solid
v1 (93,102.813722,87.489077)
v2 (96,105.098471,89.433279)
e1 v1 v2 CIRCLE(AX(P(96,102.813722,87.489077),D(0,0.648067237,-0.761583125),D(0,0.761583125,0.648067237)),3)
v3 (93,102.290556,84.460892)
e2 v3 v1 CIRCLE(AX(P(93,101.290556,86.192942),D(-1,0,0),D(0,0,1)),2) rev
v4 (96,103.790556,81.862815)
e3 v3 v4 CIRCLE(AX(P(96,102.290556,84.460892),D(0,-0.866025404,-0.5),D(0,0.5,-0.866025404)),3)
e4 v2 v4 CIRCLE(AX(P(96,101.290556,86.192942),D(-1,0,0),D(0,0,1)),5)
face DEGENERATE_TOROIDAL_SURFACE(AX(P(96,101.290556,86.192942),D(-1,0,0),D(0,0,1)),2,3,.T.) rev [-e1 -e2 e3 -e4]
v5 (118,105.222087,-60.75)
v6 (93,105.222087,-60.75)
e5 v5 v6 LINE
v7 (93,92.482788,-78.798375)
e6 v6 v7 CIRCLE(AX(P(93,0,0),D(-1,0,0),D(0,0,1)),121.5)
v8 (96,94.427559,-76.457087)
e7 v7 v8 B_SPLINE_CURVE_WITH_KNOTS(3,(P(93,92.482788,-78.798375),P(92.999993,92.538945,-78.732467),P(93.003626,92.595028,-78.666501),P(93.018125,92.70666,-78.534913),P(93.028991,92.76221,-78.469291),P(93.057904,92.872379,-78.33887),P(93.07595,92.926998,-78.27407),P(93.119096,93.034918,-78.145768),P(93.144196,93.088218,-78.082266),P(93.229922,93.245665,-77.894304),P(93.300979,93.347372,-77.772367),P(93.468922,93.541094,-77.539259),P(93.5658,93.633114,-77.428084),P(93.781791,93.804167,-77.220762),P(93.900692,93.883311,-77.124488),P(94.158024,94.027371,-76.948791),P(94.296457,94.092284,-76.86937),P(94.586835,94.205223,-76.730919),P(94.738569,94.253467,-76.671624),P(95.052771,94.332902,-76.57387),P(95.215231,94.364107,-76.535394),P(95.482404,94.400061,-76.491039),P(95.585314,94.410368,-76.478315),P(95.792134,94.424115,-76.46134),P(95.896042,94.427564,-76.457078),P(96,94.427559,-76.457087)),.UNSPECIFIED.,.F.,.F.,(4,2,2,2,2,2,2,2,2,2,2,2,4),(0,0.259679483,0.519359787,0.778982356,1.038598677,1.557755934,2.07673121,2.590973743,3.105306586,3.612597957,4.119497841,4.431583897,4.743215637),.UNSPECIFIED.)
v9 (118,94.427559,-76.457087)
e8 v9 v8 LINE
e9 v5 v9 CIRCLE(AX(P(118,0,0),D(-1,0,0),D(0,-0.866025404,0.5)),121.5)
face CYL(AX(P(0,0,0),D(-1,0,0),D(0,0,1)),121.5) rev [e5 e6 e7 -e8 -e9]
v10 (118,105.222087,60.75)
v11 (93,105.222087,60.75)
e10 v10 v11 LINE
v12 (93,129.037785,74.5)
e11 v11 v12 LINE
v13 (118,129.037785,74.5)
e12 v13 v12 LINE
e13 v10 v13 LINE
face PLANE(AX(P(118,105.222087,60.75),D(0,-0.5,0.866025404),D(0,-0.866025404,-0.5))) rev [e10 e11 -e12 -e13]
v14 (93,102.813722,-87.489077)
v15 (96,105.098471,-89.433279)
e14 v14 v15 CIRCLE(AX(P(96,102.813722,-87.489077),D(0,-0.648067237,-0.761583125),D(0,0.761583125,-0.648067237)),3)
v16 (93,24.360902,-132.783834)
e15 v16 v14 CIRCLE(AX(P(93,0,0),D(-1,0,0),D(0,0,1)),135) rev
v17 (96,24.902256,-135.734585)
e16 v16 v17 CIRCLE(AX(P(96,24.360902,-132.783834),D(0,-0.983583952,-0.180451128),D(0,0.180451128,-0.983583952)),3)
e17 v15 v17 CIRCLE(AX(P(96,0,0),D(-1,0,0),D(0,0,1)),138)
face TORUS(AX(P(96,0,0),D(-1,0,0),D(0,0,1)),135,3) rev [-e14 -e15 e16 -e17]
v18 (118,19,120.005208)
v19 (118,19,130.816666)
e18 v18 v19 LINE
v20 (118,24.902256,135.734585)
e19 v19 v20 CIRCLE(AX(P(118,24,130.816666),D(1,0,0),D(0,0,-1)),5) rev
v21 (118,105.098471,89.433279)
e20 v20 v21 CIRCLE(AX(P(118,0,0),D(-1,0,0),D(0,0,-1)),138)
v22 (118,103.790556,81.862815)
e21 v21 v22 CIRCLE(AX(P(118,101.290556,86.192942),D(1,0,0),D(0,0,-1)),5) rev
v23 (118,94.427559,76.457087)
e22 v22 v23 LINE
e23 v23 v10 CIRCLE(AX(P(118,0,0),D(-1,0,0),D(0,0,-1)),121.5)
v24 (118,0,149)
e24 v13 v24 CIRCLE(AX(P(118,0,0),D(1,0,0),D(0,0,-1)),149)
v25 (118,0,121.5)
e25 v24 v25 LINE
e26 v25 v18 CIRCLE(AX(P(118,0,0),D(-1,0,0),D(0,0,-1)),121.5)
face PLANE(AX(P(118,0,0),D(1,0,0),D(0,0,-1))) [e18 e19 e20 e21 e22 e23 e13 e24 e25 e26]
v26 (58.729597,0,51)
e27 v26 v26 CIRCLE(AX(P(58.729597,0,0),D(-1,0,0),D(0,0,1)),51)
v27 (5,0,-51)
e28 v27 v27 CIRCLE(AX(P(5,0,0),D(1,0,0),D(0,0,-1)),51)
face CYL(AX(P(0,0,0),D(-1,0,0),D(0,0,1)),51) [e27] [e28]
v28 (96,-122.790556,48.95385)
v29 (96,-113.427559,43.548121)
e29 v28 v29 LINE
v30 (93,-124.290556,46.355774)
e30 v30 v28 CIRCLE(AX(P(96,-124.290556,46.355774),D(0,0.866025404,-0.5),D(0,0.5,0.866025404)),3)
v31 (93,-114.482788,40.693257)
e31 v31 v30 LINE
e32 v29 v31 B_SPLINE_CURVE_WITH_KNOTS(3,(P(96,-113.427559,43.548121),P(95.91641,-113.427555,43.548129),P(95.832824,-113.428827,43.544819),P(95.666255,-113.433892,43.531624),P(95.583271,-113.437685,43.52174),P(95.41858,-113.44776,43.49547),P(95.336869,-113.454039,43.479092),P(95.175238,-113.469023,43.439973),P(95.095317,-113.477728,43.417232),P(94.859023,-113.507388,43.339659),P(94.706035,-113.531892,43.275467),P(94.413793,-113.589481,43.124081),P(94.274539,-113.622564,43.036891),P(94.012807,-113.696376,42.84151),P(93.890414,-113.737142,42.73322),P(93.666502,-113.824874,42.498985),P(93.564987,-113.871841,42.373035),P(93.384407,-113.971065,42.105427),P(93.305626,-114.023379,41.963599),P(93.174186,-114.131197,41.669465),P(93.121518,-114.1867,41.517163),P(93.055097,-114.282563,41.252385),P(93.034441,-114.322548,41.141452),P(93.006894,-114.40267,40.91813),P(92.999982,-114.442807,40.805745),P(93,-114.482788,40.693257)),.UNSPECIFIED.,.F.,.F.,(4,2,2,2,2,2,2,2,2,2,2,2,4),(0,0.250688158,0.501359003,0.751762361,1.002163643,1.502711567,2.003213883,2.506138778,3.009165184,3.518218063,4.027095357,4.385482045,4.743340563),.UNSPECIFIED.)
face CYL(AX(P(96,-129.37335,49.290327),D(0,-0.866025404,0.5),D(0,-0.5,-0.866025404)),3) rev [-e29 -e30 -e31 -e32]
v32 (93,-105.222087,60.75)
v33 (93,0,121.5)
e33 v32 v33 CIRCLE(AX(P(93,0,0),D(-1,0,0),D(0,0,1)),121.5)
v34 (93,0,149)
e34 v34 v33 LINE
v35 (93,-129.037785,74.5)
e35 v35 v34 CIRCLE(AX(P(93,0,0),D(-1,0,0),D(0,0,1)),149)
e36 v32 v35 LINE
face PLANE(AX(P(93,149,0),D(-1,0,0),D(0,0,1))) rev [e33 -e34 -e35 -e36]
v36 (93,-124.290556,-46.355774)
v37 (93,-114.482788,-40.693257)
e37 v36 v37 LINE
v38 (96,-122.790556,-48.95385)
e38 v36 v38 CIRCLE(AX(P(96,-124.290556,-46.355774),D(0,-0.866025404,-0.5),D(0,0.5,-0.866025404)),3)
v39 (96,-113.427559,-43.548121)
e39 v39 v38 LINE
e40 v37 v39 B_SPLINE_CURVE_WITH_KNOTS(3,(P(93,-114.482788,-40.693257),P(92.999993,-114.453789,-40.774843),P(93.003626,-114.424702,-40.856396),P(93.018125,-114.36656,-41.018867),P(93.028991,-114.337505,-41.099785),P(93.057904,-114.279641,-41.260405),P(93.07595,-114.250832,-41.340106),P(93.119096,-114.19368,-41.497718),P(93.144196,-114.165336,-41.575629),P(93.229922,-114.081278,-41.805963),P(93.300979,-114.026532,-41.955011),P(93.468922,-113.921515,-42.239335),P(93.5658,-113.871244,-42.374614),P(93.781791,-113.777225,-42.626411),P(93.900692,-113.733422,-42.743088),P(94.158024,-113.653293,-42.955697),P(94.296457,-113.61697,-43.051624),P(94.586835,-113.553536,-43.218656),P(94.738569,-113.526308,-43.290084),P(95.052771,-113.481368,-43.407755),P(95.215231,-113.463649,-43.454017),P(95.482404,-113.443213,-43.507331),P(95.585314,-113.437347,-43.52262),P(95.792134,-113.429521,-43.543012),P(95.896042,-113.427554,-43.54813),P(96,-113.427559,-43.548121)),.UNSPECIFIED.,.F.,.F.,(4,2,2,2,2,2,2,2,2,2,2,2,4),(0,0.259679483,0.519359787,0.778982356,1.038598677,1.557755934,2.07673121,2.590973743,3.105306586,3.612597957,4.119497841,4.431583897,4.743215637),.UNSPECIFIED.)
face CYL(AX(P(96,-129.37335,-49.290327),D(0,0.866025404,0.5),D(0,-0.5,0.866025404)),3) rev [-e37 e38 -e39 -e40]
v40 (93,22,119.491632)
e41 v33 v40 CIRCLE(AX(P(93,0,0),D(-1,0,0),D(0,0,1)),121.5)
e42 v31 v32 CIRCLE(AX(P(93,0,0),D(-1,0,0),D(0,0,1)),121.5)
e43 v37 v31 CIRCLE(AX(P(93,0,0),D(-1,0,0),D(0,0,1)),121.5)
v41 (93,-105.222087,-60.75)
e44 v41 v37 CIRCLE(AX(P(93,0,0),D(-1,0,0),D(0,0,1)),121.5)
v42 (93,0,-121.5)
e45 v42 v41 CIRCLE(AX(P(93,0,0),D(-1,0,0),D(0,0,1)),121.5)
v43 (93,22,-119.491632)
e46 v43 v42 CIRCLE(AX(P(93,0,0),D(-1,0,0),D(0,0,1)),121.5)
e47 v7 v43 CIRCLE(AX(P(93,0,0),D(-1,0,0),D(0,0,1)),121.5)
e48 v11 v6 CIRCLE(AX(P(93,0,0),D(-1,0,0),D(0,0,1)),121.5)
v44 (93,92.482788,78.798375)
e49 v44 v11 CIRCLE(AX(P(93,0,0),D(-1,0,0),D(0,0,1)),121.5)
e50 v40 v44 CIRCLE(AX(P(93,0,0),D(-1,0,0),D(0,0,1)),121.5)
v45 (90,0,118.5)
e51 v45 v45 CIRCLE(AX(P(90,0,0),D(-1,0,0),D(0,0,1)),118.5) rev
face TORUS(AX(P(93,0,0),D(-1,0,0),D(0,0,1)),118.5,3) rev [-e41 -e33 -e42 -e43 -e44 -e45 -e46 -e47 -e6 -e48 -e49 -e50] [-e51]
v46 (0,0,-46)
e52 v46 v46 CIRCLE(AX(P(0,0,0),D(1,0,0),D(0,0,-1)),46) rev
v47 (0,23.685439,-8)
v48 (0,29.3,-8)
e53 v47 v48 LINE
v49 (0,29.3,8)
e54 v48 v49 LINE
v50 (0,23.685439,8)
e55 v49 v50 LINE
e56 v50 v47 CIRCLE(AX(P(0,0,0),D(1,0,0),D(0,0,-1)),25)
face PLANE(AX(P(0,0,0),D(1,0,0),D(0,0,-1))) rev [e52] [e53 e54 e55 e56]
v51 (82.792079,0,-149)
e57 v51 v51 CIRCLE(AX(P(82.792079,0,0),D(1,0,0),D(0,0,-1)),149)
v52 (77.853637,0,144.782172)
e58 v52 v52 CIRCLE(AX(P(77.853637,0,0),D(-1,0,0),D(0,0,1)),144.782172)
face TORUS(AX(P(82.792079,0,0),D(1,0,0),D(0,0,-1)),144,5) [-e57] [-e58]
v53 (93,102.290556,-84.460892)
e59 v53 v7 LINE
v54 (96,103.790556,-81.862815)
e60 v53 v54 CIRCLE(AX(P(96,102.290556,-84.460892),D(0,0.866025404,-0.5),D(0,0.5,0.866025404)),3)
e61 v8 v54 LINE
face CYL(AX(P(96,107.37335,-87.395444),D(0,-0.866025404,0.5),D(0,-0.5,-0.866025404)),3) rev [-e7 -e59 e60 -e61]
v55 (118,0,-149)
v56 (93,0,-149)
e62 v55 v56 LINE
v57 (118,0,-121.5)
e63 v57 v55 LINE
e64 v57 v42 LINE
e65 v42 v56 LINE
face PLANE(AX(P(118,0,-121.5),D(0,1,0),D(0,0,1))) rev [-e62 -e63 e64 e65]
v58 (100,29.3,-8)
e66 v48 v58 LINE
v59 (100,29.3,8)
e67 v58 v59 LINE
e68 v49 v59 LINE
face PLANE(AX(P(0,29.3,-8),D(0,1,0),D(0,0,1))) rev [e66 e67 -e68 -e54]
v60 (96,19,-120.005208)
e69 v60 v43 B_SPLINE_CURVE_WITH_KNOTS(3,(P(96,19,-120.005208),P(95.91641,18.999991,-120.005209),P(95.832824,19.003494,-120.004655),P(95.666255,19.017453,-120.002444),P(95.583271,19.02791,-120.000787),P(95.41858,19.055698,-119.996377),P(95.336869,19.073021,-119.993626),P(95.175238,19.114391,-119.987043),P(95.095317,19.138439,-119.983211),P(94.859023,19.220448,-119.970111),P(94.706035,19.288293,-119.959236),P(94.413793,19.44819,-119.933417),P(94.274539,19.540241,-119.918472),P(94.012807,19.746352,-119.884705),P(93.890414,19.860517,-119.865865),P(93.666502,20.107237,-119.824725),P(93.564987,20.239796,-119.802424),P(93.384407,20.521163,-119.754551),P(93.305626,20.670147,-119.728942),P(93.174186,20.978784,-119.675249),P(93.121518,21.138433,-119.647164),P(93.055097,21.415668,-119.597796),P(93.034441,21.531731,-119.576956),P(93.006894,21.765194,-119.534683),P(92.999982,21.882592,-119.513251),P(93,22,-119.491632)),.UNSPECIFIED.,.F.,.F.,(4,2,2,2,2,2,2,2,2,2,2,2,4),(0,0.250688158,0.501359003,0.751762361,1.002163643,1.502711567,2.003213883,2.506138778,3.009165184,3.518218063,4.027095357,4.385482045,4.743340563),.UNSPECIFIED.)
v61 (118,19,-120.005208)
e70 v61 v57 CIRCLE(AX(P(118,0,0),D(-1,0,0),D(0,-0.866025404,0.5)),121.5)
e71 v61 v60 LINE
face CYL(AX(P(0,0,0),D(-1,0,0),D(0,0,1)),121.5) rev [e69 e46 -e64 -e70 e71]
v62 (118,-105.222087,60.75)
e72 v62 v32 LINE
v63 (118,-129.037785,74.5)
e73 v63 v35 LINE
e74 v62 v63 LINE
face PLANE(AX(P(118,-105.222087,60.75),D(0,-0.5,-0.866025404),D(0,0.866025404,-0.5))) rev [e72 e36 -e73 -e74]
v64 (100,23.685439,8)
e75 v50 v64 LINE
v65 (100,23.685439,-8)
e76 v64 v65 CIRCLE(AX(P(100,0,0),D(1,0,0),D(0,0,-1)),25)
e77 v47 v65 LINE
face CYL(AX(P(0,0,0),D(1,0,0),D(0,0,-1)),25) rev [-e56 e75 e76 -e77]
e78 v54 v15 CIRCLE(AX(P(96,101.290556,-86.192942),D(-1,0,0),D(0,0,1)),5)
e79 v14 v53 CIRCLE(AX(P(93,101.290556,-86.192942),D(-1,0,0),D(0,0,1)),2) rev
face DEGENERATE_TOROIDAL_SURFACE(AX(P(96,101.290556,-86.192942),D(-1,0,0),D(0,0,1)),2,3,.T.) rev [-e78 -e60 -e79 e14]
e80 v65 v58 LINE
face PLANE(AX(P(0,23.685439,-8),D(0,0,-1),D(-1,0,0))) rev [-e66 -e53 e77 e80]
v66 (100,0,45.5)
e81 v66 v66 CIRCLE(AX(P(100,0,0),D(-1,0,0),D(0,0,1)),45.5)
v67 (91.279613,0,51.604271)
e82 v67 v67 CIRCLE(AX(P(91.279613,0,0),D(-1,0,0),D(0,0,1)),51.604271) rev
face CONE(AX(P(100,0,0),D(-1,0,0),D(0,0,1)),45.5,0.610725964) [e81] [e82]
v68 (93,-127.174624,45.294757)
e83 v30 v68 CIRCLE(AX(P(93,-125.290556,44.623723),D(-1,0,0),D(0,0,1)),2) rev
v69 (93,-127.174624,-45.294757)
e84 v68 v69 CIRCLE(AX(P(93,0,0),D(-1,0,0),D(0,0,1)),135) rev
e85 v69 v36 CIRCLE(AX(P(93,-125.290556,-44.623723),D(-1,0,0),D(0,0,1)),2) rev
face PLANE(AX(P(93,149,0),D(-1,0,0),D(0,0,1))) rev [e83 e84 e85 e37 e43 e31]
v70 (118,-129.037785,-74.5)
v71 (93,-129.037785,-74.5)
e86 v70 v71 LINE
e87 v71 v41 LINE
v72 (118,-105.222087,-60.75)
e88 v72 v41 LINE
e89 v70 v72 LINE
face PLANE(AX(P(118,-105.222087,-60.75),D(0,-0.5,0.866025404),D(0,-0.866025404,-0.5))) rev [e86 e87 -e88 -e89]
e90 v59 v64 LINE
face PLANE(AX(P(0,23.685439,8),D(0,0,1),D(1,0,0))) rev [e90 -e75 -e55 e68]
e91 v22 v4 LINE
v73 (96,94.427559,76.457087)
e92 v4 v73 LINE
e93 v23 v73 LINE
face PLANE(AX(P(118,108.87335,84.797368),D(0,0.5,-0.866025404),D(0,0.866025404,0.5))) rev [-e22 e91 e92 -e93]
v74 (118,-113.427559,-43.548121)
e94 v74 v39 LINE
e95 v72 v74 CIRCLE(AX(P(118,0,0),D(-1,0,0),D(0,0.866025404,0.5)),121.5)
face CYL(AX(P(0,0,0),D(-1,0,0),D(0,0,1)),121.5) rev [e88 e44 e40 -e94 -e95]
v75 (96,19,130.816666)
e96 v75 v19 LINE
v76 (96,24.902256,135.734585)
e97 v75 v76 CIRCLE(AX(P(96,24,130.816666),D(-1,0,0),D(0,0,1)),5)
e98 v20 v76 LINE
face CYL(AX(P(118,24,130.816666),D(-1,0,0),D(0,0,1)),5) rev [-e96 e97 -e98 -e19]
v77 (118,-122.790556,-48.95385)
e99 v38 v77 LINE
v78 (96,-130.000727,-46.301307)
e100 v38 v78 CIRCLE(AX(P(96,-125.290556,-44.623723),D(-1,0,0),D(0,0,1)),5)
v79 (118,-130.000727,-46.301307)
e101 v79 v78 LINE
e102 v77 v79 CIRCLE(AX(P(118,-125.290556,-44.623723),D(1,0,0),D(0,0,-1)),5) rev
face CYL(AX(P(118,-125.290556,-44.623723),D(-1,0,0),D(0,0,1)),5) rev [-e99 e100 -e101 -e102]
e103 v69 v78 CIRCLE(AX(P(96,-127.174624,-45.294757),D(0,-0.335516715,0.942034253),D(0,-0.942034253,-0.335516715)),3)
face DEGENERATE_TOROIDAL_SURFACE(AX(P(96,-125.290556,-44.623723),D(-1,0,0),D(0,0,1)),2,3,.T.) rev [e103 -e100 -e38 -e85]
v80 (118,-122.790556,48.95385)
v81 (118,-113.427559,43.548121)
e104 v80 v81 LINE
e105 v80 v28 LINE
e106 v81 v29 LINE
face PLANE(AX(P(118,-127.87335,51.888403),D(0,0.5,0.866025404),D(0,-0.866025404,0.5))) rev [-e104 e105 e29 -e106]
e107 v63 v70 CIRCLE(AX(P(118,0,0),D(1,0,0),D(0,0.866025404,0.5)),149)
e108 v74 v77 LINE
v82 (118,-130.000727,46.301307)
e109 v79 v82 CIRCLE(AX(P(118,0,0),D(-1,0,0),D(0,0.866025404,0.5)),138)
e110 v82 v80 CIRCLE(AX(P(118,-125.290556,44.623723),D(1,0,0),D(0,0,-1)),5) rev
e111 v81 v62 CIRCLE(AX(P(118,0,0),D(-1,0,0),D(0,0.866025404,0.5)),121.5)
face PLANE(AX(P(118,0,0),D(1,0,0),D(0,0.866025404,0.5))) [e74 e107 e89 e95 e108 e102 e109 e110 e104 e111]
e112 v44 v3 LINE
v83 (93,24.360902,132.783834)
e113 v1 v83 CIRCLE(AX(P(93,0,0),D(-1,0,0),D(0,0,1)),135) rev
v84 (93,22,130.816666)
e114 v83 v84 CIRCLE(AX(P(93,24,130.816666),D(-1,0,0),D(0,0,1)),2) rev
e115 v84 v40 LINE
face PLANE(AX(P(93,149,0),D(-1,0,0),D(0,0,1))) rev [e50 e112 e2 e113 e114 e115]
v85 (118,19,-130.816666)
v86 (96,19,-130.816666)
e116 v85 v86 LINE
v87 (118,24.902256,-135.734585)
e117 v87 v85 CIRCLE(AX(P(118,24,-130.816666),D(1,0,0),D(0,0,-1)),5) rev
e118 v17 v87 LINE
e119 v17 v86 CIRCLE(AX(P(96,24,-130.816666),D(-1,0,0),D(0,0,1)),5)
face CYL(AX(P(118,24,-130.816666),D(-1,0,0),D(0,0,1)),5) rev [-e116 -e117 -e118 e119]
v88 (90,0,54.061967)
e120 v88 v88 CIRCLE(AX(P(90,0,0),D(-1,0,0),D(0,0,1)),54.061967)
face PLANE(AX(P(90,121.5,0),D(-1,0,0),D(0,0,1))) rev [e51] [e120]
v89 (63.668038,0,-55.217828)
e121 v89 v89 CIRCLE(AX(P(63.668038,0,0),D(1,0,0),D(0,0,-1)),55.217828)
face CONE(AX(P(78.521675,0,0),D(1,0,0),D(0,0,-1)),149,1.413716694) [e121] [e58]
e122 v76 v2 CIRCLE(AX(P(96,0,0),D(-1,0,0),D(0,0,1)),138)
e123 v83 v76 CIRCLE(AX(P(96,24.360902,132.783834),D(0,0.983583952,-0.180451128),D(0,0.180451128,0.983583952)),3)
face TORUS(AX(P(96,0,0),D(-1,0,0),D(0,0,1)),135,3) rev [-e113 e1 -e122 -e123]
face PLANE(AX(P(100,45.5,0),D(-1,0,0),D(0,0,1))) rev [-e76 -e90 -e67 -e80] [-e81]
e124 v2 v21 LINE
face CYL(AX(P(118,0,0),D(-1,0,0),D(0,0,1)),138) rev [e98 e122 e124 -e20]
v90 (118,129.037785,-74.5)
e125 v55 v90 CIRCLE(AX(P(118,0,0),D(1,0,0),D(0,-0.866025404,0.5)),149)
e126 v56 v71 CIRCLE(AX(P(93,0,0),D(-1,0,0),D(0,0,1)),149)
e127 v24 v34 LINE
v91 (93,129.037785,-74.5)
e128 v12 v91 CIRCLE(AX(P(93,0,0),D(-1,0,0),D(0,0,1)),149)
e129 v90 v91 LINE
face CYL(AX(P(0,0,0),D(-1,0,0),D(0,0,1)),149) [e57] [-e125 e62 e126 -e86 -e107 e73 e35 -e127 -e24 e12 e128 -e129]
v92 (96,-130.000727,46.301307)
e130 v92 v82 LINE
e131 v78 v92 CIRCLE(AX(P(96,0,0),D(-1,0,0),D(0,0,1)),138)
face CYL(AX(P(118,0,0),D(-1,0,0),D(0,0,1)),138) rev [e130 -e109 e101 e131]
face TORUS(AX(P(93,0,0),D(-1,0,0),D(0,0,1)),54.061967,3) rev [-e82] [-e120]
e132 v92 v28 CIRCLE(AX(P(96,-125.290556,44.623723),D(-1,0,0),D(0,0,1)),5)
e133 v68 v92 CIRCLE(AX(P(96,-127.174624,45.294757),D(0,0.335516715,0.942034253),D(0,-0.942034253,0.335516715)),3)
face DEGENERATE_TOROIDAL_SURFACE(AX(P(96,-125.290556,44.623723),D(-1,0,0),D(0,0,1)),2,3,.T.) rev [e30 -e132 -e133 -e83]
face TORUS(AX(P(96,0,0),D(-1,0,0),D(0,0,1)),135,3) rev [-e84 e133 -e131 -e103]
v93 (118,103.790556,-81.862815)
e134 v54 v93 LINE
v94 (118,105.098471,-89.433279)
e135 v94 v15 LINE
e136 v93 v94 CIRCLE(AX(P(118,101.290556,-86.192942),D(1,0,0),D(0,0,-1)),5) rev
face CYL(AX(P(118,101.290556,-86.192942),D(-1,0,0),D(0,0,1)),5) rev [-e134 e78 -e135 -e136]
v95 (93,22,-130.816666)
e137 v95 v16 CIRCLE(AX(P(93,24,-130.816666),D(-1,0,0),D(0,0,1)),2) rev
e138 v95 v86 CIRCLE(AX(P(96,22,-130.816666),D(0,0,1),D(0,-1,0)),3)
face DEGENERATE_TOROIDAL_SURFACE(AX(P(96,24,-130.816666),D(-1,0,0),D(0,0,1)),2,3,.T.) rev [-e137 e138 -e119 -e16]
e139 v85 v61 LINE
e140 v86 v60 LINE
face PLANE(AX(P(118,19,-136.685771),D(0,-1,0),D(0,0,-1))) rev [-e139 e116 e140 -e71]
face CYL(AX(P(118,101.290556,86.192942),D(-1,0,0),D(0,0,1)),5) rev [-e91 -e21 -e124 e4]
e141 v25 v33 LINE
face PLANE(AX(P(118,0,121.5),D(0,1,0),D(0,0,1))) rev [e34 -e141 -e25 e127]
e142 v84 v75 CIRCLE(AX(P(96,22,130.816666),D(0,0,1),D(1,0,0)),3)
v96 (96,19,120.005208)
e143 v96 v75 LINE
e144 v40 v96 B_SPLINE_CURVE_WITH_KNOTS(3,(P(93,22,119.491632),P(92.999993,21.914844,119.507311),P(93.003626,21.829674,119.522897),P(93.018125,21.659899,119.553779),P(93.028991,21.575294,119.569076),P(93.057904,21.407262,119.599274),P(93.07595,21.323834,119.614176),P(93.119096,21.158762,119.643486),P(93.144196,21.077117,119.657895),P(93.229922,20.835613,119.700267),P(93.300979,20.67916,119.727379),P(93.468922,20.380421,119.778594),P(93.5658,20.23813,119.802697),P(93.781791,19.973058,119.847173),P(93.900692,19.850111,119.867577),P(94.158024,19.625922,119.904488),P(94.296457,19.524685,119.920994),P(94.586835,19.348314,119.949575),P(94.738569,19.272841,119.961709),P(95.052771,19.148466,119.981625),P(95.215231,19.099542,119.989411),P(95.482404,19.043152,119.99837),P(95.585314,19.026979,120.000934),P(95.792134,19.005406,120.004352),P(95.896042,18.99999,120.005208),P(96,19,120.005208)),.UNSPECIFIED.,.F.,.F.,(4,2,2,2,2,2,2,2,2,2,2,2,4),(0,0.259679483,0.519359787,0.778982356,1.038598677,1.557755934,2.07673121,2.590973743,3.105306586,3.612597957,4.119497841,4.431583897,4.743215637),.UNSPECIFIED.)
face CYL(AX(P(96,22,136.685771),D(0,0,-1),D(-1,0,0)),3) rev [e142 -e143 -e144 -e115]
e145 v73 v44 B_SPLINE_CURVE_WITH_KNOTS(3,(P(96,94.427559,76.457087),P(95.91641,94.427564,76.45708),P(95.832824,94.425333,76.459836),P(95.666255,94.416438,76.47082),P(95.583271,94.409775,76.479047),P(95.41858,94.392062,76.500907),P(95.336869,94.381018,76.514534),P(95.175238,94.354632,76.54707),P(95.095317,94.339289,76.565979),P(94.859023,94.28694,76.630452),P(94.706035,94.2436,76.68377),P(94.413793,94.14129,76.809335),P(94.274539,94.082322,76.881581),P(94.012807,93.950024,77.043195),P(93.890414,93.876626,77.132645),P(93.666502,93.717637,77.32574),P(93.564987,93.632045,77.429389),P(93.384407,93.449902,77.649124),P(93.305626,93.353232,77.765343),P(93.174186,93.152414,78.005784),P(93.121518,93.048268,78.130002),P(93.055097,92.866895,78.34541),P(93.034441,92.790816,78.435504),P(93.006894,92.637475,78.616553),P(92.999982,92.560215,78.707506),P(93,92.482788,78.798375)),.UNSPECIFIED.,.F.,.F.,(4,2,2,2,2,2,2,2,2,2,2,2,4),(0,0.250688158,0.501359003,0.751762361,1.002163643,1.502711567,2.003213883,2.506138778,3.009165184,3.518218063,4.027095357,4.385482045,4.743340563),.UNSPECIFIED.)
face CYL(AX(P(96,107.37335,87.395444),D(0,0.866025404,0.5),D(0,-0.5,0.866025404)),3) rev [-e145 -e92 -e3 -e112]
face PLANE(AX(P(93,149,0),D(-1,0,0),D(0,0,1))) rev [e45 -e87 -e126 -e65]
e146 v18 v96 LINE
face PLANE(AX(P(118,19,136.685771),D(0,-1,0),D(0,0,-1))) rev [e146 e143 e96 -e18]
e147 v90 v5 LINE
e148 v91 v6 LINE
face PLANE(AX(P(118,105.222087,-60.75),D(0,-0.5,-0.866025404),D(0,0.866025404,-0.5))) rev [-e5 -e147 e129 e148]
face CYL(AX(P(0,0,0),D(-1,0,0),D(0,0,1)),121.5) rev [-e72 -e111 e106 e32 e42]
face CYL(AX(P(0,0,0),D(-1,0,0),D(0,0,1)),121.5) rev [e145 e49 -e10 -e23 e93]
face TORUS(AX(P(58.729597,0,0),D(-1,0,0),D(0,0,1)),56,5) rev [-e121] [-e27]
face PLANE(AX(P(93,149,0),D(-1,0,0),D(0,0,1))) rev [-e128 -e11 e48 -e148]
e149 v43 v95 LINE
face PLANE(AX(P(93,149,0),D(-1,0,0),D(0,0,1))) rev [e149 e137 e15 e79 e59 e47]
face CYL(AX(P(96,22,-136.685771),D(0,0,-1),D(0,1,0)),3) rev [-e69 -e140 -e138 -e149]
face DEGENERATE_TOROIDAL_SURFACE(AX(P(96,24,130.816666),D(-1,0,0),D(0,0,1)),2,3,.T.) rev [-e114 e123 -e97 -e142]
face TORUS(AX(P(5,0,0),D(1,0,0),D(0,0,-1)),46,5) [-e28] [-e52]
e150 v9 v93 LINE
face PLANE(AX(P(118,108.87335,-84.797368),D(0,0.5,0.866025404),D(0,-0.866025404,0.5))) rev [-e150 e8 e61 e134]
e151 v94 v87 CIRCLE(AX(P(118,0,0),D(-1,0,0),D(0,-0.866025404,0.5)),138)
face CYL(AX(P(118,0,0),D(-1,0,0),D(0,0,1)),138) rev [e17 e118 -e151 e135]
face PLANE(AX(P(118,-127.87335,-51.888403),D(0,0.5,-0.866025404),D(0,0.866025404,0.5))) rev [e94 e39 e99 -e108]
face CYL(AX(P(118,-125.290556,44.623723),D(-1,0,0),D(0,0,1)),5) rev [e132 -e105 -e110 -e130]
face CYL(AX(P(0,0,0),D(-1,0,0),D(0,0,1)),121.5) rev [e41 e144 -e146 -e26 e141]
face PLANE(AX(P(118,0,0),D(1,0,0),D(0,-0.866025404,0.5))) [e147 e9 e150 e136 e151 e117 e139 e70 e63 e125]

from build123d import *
from build123d.topology import SkipClean

# Parameters (mm, degrees)
EXTRUDE_1_DEPTH          = 25
PATTERN_CIRCULAR_1_COUNT = 3
CUT_EXTRUDE_2_DEPTH      = 234.242363219
FILLET_1_R               = 5
FILLET_2_R               = 3
FILLET_4_R               = 3


# Some blends are built 0.0001 mm under size
with BuildPart() as part:
    # 草圖1 → 旋轉1 (revolve)
    with BuildSketch(Plane.XY, mode=Mode.PRIVATE) as revolve_1_sk:
        Polygon((0, 0), (0, 51), (63, 51), (78.521675152, 149), (93, 149), (93, 121.5), (90, 121.5), (90, 52.5), (100, 45.5), (100, 0), align=None)
    revolve(revolve_1_sk.sketch.rotate(Axis((0, 0, 0), (1, 0, 0)), 90), axis=Axis((0, 0, 0), (1, 0, 0)))

    # 草圖2 → 伸長1 (add)
    with SkipClean():  # the faces are left unmerged after this step: merging them gives an invalid solid
        with BuildSketch(Plane(origin=(93, 0, 0), x_dir=(0, 0, -1), z_dir=(1, 0, 0))):
            with BuildLine():
                Line((-121.5, 0), (-149, 0))
                ThreePointArc((-149, 0), (-129.037785164, 74.5), (-74.5, 129.037785164))
                Line((-74.5, 129.037785164), (-60.75, 105.22208656))
                ThreePointArc((-60.75, 105.22208656), (-68.815526029, 100.133278072), (-76.457086782, 94.427558905))
                Line((-76.457086782, 94.427558905), (-84.797368183, 108.873350041))
                ThreePointArc((-84.797368183, 108.873350041), (-119.511505722, 69), (-136.685771022, 19))
                Line((-136.685771022, 19), (-120.00520822, 19))
                ThreePointArc((-120.00520822, 19), (-121.125725589, 9.52935468), (-121.5, 0))
            make_face()
        extrude_1 = extrude(amount=EXTRUDE_1_DEPTH)

    # 環狀複製排列1: 伸長1 ×3 about axis
    with SkipClean():  # the faces are left unmerged after this step: merging them gives an invalid solid
        pattern_circular_1_axis = Axis((0, 0, 0), (1, 0, 0))
        for i in range(1, PATTERN_CIRCULAR_1_COUNT):
            add(extrude_1.rotate(pattern_circular_1_axis, i * 360 / PATTERN_CIRCULAR_1_COUNT))

    # 草圖3 → 伸長2 (cut, through all)
    with SkipClean():  # the faces are left unmerged after this step: merging them gives an invalid solid
        with BuildSketch(Plane(origin=(100, 0, 0), x_dir=(0, 0, -1), z_dir=(1, 0, 0))):
            with BuildLine():
                Line((8, 23.685438565), (8, 29.3))
                Line((8, 29.3), (-8, 29.3))
                Line((-8, 29.3), (-8, 23.685438565))
                ThreePointArc((-8, 23.685438565), (0, -25), (8, 23.685438565))
            make_face()
        extrude(amount=-CUT_EXTRUDE_2_DEPTH, mode=Mode.SUBTRACT)

    # 圓角1
    fillet_1_edges = [part.edges().sort_by_distance(p)[0] for p in [
        (63, 0, -51),
        (0, 0, -51),
        (105.5, 19, 136.685771022),
        (105.5, 108.873350041, 84.797368183),
        (105.5, 108.873350041, -84.797368183),
        (105.5, 19, -136.685771022),
        (105.5, -127.873350041, -51.888402839),
        (105.5, -127.873350041, 51.888402839),
        (78.521675152, 0, -149),
    ]]
    fillet(fillet_1_edges, radius=FILLET_1_R)

    # 圓角2
    fillet_2_edges = [part.edges().sort_by_distance(p)[0] for p in [
        (90, 0, -52.5),
        (90, 0, -121.5),
    ]]
    fillet(fillet_2_edges, radius=FILLET_2_R - 0.0001)  # a hair under: the kernel refuses the full size

    # 圓角4
    # the kernel refuses this fillet: 3 mm, written as the material it adds along each edge
    with BuildSketch(Plane(origin=(93, -122.790555652, -48.953850131), x_dir=(0, -0.4999999999999997, 0.8660254037844387), z_dir=(0, 0.8660254037844388, 0.4999999999999998))) as fillet_4_piece_1_section:
        with BuildLine():
            CenterArc((FILLET_4_R, FILLET_4_R), FILLET_4_R, 180, 90)
            Line((0, FILLET_4_R), (0, 0))
            Line((0, 0), (FILLET_4_R, 0))
        make_face()
    fillet_4_piece_1 = extrude(amount=18.311457385, mode=Mode.PRIVATE)
    fillet_4_piece_1 = fillet_4_piece_1 - Plane(origin=(93.675428754, 0, 0), x_dir=(0, 0, 1), z_dir=(-1, 0, 0)) * Cylinder(121.5, 49, mode=Mode.PRIVATE)
    add(fillet_4_piece_1)
    with BuildSketch(Plane(origin=(93, -125.290555652, -44.623723112), x_dir=(0, 0.49999999999999956, -0.8660254037844388), z_dir=(0, 0.8660254037844388, 0.49999999999999956))) as fillet_4_piece_2:
        with BuildLine():
            CenterArc((5 - FILLET_4_R, -FILLET_4_R), FILLET_4_R, 0, 90)
            Line((5, -FILLET_4_R), (5, 0))
            Line((5, 0), (5 - FILLET_4_R, 0))
        make_face()
    revolve(axis=Axis((93, -125.290555652, -44.623723112), (-1, 0, 0)), revolution_arc=100.39603782)
    with BuildSketch(Plane(origin=(93, -106.932368377, 39.798121438), x_dir=(0, -0.5000000000000021, -0.8660254037844374), z_dir=(0, -0.8660254037844375, 0.5000000000000022))) as fillet_4_piece_3_section:
        with BuildLine():
            CenterArc((FILLET_4_R, FILLET_4_R), FILLET_4_R, 180, 90)
            Line((0, FILLET_4_R), (0, 0))
            Line((0, 0), (FILLET_4_R, 0))
        make_face()
    fillet_4_piece_3 = extrude(amount=18.311457385, mode=Mode.PRIVATE)
    fillet_4_piece_3 = fillet_4_piece_3 - Plane(origin=(93.675434129, 0, 0), x_dir=(0, 0, 1), z_dir=(-1, 0, 0)) * Cylinder(121.5, 49, mode=Mode.PRIVATE)
    add(fillet_4_piece_3)
    with BuildSketch(Plane(origin=(93, -125.290555652, 44.623723112), x_dir=(0, 0.5000000000000057, 0.8660254037844354), z_dir=(0, 0.8660254037844354, -0.5000000000000057))) as fillet_4_piece_4:
        with BuildLine():
            CenterArc((5 - FILLET_4_R, FILLET_4_R), FILLET_4_R, 270, 90)
            Line((5, FILLET_4_R), (5, 0))
            Line((5, 0), (5 - FILLET_4_R, 0))
        make_face()
    revolve(axis=Axis((93, -125.290555652, 44.623723112), (1, 0, 0)), revolution_arc=100.39603782)
    with BuildSketch(Plane(origin=(93, 103.790555652, -81.862815474), x_dir=(0, -0.5000000000000004, -0.8660254037844384), z_dir=(0, -0.8660254037844384, 0.5000000000000004))) as fillet_4_piece_5_section:
        with BuildLine():
            CenterArc((FILLET_4_R, FILLET_4_R), FILLET_4_R, 180, 90)
            Line((0, FILLET_4_R), (0, 0))
            Line((0, 0), (FILLET_4_R, 0))
        make_face()
    fillet_4_piece_5 = extrude(amount=18.311457385, mode=Mode.PRIVATE)
    fillet_4_piece_5 = fillet_4_piece_5 - Plane(origin=(93.675428754, 0, 0), x_dir=(0, 0, 1), z_dir=(-1, 0, 0)) * Cylinder(121.5, 49, mode=Mode.PRIVATE)
    add(fillet_4_piece_5)
    with BuildSketch(Plane(origin=(93, 101.290555652, -86.192942493), x_dir=(0, 0.49999999999999956, 0.8660254037844388), z_dir=(0, -0.8660254037844388, 0.49999999999999956))) as fillet_4_piece_6:
        with BuildLine():
            CenterArc((5 - FILLET_4_R, -FILLET_4_R), FILLET_4_R, 0, 90)
            Line((5, -FILLET_4_R), (5, 0))
            Line((5, 0), (5 - FILLET_4_R, 0))
        make_face()
    revolve(axis=Axis((93, 101.290555652, -86.192942493), (-1, 0, 0)), revolution_arc=100.39603782)
    with BuildSketch(Plane(origin=(93, 19, -112.50520822), x_dir=(0, 1, 0), z_dir=(0, 0, -1))) as fillet_4_piece_7_section:
        with BuildLine():
            CenterArc((FILLET_4_R, FILLET_4_R), FILLET_4_R, 180, 90)
            Line((0, FILLET_4_R), (0, 0))
            Line((0, 0), (FILLET_4_R, 0))
        make_face()
    fillet_4_piece_7 = extrude(amount=18.311457385, mode=Mode.PRIVATE)
    fillet_4_piece_7 = fillet_4_piece_7 - Plane(origin=(93.675434129, 0, 0), x_dir=(0, 0, 1), z_dir=(-1, 0, 0)) * Cylinder(121.5, 49, mode=Mode.PRIVATE)
    add(fillet_4_piece_7)
    with BuildSketch(Plane(origin=(93, 24, -130.816665605), x_dir=(0, -1, 0), z_dir=(0, 0, 1))) as fillet_4_piece_8:
        with BuildLine():
            CenterArc((5 - FILLET_4_R, FILLET_4_R), FILLET_4_R, 270, 90)
            Line((5, FILLET_4_R), (5, 0))
            Line((5, 0), (5 - FILLET_4_R, 0))
        make_face()
    revolve(axis=Axis((93, 24, -130.816665605), (1, 0, 0)), revolution_arc=100.39603782)
    with BuildSketch(Plane(origin=(93, 19, 130.816665605), x_dir=(0, 1, 0), z_dir=(0, 0, -1))) as fillet_4_piece_9_section:
        with BuildLine():
            CenterArc((FILLET_4_R, FILLET_4_R), FILLET_4_R, 180, 90)
            Line((0, FILLET_4_R), (0, 0))
            Line((0, 0), (FILLET_4_R, 0))
        make_face()
    fillet_4_piece_9 = extrude(amount=18.311457385, mode=Mode.PRIVATE)
    fillet_4_piece_9 = fillet_4_piece_9 - Plane(origin=(93.675428754, 0, 0), x_dir=(0, 0, 1), z_dir=(-1, 0, 0)) * Cylinder(121.5, 49, mode=Mode.PRIVATE)
    add(fillet_4_piece_9)
    with BuildSketch(Plane(origin=(93, 24, 130.816665605), x_dir=(0, -1, 0), z_dir=(0, 0, -1))) as fillet_4_piece_10:
        with BuildLine():
            CenterArc((5 - FILLET_4_R, -FILLET_4_R), FILLET_4_R, 0, 90)
            Line((5, -FILLET_4_R), (5, 0))
            Line((5, 0), (5 - FILLET_4_R, 0))
        make_face()
    revolve(axis=Axis((93, 24, 130.816665605), (-1, 0, 0)), revolution_arc=100.39603782)
    with BuildSketch(Plane(origin=(93, 87.932368377, 72.707086782), x_dir=(0, -0.49999999999999795, 0.8660254037844397), z_dir=(0, 0.8660254037844398, 0.49999999999999806))) as fillet_4_piece_11_section:
        with BuildLine():
            CenterArc((FILLET_4_R, FILLET_4_R), FILLET_4_R, 180, 90)
            Line((0, FILLET_4_R), (0, 0))
            Line((0, 0), (FILLET_4_R, 0))
        make_face()
    fillet_4_piece_11 = extrude(amount=18.311457385, mode=Mode.PRIVATE)
    fillet_4_piece_11 = fillet_4_piece_11 - Plane(origin=(93.675434129, 0, 0), x_dir=(0, 0, 1), z_dir=(-1, 0, 0)) * Cylinder(121.5, 49, mode=Mode.PRIVATE)
    add(fillet_4_piece_11)
    with BuildSketch(Plane(origin=(93, 101.290555652, 86.192942493), x_dir=(0, 0.49999999999999745, -0.86602540378444), z_dir=(0, -0.86602540378444, -0.49999999999999745))) as fillet_4_piece_12:
        with BuildLine():
            CenterArc((5 - FILLET_4_R, FILLET_4_R), FILLET_4_R, 270, 90)
            Line((5, FILLET_4_R), (5, 0))
            Line((5, 0), (5 - FILLET_4_R, 0))
        make_face()
    revolve(axis=Axis((93, 101.290555652, 86.192942493), (1, 0, 0)), revolution_arc=100.39603782)
    with BuildSketch(Plane(origin=(93, 0, 0), x_dir=(0, -0.9420342530245831, 0.33551671512521647), z_dir=(0, 0.33551671512521647, 0.9420342530245831))) as fillet_4_piece_13:
        with BuildLine():
            CenterArc((138 - FILLET_4_R, FILLET_4_R), FILLET_4_R, 270, 90)
            Line((138, FILLET_4_R), (138, 0))
            Line((138, 0), (138 - FILLET_4_R, 0))
        make_face()
    revolve(axis=Axis((93, 0, 0), (1, 0, 0)), revolution_arc=39.20792436)
    with BuildSketch(Plane(origin=(93, 0, 0), x_dir=(0, 0.18045112781954722, -0.9835839519169949), z_dir=(0, -0.9835839519169949, -0.18045112781954722))) as fillet_4_piece_14:
        with BuildLine():
            CenterArc((138 - FILLET_4_R, FILLET_4_R), FILLET_4_R, 270, 90)
            Line((138, FILLET_4_R), (138, 0))
            Line((138, 0), (138 - FILLET_4_R, 0))
        make_face()
    revolve(axis=Axis((93, 0, 0), (1, 0, 0)), revolution_arc=39.20792436)
    with BuildSketch(Plane(origin=(93, 0, 0), x_dir=(0, 0.7615831252050357, 0.6480672367917786), z_dir=(0, 0.6480672367917786, -0.7615831252050357))) as fillet_4_piece_15:
        with BuildLine():
            CenterArc((138 - FILLET_4_R, FILLET_4_R), FILLET_4_R, 270, 90)
            Line((138, FILLET_4_R), (138, 0))
            Line((138, 0), (138 - FILLET_4_R, 0))
        make_face()
    revolve(axis=Axis((93, 0, 0), (1, 0, 0)), revolution_arc=39.20792436)


solid = part.part
